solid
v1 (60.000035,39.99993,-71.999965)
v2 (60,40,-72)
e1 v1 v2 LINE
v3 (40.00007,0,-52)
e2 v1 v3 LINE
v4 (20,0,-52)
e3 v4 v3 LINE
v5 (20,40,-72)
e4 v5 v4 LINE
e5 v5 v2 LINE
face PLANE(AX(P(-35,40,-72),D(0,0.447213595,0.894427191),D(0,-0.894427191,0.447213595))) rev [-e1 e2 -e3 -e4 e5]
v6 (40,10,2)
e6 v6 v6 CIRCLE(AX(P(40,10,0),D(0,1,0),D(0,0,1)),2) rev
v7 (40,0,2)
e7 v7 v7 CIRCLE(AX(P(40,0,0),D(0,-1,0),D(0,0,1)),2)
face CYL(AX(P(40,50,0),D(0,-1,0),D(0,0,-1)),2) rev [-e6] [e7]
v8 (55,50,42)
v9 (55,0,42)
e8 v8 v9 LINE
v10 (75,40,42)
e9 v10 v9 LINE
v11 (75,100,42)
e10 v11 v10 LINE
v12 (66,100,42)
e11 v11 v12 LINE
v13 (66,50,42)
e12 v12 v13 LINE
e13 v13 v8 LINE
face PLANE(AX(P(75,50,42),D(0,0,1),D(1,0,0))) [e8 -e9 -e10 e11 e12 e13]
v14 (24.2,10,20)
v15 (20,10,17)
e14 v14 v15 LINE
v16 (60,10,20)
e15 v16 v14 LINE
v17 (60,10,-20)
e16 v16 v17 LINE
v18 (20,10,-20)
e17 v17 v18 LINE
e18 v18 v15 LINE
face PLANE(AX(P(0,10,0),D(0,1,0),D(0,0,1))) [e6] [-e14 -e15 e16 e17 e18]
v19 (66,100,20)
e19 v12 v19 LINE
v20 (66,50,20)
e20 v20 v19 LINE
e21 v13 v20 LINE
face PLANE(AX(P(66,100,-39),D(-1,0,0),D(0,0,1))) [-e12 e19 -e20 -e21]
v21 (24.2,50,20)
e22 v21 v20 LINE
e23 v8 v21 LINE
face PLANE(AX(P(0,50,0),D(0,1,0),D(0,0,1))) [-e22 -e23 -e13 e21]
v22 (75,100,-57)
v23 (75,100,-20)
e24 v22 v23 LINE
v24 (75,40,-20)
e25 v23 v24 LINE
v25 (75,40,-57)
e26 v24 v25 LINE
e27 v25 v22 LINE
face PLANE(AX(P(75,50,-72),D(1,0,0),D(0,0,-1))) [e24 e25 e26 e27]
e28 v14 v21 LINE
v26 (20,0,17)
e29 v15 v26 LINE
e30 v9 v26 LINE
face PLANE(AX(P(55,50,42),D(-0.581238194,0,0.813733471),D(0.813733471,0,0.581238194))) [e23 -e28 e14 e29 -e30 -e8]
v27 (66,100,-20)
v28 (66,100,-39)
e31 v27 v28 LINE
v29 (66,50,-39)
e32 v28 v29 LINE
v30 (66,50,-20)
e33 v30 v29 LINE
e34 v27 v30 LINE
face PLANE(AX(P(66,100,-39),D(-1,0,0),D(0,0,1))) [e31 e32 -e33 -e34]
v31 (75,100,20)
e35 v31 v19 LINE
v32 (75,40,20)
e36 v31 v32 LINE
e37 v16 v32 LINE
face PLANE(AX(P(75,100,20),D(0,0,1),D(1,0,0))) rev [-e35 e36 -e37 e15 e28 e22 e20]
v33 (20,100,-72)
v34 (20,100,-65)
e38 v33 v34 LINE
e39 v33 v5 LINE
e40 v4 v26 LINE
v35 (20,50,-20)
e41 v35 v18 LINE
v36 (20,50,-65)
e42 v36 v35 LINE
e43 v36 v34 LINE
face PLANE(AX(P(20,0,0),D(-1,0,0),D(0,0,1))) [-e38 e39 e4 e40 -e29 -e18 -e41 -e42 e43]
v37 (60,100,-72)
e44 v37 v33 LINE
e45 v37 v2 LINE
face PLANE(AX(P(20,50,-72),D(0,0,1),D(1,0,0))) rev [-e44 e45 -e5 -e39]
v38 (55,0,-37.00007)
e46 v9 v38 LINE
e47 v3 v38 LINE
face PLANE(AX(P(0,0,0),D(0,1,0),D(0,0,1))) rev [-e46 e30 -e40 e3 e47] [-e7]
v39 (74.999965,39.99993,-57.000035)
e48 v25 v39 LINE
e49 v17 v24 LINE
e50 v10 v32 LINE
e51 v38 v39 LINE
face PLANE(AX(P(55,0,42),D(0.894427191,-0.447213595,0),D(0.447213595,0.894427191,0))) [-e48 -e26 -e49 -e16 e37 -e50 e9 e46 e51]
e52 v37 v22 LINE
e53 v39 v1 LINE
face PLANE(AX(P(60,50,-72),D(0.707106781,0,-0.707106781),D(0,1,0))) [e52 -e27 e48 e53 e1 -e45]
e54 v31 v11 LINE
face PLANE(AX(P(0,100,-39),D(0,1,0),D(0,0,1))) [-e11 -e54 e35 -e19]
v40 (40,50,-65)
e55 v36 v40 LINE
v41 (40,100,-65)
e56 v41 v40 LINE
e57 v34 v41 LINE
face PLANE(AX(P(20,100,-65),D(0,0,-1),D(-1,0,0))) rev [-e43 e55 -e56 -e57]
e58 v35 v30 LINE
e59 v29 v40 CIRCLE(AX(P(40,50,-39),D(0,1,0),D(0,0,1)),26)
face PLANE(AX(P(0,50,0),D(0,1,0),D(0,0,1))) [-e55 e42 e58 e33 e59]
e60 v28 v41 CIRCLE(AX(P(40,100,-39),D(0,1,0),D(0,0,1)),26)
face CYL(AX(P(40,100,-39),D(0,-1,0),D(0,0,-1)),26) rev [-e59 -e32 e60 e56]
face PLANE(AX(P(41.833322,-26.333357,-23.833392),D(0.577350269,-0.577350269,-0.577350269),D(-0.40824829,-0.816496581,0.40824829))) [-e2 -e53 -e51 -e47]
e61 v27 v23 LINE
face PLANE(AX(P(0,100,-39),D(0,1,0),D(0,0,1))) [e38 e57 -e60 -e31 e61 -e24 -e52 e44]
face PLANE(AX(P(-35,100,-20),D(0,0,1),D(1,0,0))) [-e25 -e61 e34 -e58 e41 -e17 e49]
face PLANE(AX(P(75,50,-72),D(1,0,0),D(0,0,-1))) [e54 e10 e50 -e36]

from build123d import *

# Parameters (mm, degrees)
SKETCH_1_R          = 2
EXTRUDE_1_DEPTH     = 50
CHAMFER_1_SIZE      = 15
EXTRUDE_2_DEPTH     = 50
CUT_EXTRUDE_START   = -40
SKETCH_3_W          = 55
SKETCH_3_H          = 40
CUT_EXTRUDE_1_DEPTH = 90
CUT_EXTRUDE_2_DEPTH = 156.630973781
CUT_EXTRUDE_3_DEPTH = 135.940727729
CHAMFER_2_SIZE      = 13.693
SKETCH_6_W          = 173.278000667
SKETCH_6_H          = 121.012081988
CUT_EXTRUDE_4_DEPTH = 55


# Read off the part's stored shape, not the designer's step: 镜向1
with BuildPart() as part:
    # 草图1 → 凸台-拉伸1 (new body)
    with BuildSketch(Plane(origin=(0, 0, 0), x_dir=(1, 0, 0), z_dir=(0, 1, 0))):
        Polygon((-35, 72), (-35, -42), (-15, -42), (20, -17), (20, 14.02557275), (20, 72), align=None)
        with Locations(Location((0, 0, 0), (0, 0, 270))):
            Circle(SKETCH_1_R, mode=Mode.SUBTRACT)
    extrude(amount=EXTRUDE_1_DEPTH)

    # 倒角1
    chamfer_1_edges = [part.edges().sort_by_distance(p)[0] for p in [
        (-35, 25, -72),
    ]]
    chamfer(chamfer_1_edges, length=CHAMFER_1_SIZE)

    # 草图2 → 凸台-拉伸2 (add)
    with BuildSketch(Plane(origin=(0, 50, 0), x_dir=(1, 0, 0), z_dir=(0, 1, 0))):
        with BuildLine():
            Line((-26, 39), (-26, -42))
            Line((-26, -42), (-35, -42))
            Line((-35, -42), (-35, 57))
            Line((-35, 57), (-20, 72))
            Line((-20, 72), (20, 72))
            Line((20, 72), (20, 65))
            Line((20, 65), (0, 65))
            ThreePointArc((0, 65), (-18.384776311, 57.384776311), (-26, 39))
        make_face()
    extrude(amount=EXTRUDE_2_DEPTH)

    # 草图3 → 切除-拉伸1 (cut)
    with BuildSketch(Plane(origin=(0, 50, 0), x_dir=(1, 0, 0), z_dir=(0, 1, 0)).offset(CUT_EXTRUDE_START)):
        with Locations((-7.5, 0)):
            Rectangle(SKETCH_3_W, SKETCH_3_H)
    extrude(amount=CUT_EXTRUDE_1_DEPTH, mode=Mode.SUBTRACT)

    # 草图4 → 切除-拉伸2 (cut, through all)
    with BuildSketch(Plane(origin=(0, 0, -72), x_dir=(-1, 0, 0), z_dir=(0, 0, -1))):
        Polygon((15, 0), (35, 40), (35, 0), align=None)
    extrude(amount=-CUT_EXTRUDE_2_DEPTH, mode=Mode.SUBTRACT)

    # 草图5 → 切除-拉伸3 (cut, through all)
    with BuildSketch(Plane(origin=(20, 0, 0), x_dir=(0, 0, -1), z_dir=(1, 0, 0))):
        Polygon((52, 0), (72, 0), (72, 40), align=None)
    extrude(amount=-CUT_EXTRUDE_3_DEPTH, mode=Mode.SUBTRACT)

    # 倒角2
    chamfer_2_edges = [part.edges().sort_by_distance(p)[0] for p in [
        (-21.25, 12.5, -58.25),
    ]]
    chamfer(chamfer_2_edges, length=CHAMFER_2_SIZE)

    # 镜向1: part across plane


with BuildPart() as part_1:
    add(part.part)
    add(part.part.mirror(Plane(origin=(20, 50, -14.02557275), x_dir=(0, 0, 1), z_dir=(-1, 0, 0))))

    # 草图6 → 切除-拉伸4 (cut)
    with BuildSketch(Plane.ZY.offset(35)):
        with Locations((-6.407902148, 50.117716033)):
            Rectangle(SKETCH_6_W, SKETCH_6_H)
    extrude(amount=-CUT_EXTRUDE_4_DEPTH, mode=Mode.SUBTRACT)


solid = part_1.part
